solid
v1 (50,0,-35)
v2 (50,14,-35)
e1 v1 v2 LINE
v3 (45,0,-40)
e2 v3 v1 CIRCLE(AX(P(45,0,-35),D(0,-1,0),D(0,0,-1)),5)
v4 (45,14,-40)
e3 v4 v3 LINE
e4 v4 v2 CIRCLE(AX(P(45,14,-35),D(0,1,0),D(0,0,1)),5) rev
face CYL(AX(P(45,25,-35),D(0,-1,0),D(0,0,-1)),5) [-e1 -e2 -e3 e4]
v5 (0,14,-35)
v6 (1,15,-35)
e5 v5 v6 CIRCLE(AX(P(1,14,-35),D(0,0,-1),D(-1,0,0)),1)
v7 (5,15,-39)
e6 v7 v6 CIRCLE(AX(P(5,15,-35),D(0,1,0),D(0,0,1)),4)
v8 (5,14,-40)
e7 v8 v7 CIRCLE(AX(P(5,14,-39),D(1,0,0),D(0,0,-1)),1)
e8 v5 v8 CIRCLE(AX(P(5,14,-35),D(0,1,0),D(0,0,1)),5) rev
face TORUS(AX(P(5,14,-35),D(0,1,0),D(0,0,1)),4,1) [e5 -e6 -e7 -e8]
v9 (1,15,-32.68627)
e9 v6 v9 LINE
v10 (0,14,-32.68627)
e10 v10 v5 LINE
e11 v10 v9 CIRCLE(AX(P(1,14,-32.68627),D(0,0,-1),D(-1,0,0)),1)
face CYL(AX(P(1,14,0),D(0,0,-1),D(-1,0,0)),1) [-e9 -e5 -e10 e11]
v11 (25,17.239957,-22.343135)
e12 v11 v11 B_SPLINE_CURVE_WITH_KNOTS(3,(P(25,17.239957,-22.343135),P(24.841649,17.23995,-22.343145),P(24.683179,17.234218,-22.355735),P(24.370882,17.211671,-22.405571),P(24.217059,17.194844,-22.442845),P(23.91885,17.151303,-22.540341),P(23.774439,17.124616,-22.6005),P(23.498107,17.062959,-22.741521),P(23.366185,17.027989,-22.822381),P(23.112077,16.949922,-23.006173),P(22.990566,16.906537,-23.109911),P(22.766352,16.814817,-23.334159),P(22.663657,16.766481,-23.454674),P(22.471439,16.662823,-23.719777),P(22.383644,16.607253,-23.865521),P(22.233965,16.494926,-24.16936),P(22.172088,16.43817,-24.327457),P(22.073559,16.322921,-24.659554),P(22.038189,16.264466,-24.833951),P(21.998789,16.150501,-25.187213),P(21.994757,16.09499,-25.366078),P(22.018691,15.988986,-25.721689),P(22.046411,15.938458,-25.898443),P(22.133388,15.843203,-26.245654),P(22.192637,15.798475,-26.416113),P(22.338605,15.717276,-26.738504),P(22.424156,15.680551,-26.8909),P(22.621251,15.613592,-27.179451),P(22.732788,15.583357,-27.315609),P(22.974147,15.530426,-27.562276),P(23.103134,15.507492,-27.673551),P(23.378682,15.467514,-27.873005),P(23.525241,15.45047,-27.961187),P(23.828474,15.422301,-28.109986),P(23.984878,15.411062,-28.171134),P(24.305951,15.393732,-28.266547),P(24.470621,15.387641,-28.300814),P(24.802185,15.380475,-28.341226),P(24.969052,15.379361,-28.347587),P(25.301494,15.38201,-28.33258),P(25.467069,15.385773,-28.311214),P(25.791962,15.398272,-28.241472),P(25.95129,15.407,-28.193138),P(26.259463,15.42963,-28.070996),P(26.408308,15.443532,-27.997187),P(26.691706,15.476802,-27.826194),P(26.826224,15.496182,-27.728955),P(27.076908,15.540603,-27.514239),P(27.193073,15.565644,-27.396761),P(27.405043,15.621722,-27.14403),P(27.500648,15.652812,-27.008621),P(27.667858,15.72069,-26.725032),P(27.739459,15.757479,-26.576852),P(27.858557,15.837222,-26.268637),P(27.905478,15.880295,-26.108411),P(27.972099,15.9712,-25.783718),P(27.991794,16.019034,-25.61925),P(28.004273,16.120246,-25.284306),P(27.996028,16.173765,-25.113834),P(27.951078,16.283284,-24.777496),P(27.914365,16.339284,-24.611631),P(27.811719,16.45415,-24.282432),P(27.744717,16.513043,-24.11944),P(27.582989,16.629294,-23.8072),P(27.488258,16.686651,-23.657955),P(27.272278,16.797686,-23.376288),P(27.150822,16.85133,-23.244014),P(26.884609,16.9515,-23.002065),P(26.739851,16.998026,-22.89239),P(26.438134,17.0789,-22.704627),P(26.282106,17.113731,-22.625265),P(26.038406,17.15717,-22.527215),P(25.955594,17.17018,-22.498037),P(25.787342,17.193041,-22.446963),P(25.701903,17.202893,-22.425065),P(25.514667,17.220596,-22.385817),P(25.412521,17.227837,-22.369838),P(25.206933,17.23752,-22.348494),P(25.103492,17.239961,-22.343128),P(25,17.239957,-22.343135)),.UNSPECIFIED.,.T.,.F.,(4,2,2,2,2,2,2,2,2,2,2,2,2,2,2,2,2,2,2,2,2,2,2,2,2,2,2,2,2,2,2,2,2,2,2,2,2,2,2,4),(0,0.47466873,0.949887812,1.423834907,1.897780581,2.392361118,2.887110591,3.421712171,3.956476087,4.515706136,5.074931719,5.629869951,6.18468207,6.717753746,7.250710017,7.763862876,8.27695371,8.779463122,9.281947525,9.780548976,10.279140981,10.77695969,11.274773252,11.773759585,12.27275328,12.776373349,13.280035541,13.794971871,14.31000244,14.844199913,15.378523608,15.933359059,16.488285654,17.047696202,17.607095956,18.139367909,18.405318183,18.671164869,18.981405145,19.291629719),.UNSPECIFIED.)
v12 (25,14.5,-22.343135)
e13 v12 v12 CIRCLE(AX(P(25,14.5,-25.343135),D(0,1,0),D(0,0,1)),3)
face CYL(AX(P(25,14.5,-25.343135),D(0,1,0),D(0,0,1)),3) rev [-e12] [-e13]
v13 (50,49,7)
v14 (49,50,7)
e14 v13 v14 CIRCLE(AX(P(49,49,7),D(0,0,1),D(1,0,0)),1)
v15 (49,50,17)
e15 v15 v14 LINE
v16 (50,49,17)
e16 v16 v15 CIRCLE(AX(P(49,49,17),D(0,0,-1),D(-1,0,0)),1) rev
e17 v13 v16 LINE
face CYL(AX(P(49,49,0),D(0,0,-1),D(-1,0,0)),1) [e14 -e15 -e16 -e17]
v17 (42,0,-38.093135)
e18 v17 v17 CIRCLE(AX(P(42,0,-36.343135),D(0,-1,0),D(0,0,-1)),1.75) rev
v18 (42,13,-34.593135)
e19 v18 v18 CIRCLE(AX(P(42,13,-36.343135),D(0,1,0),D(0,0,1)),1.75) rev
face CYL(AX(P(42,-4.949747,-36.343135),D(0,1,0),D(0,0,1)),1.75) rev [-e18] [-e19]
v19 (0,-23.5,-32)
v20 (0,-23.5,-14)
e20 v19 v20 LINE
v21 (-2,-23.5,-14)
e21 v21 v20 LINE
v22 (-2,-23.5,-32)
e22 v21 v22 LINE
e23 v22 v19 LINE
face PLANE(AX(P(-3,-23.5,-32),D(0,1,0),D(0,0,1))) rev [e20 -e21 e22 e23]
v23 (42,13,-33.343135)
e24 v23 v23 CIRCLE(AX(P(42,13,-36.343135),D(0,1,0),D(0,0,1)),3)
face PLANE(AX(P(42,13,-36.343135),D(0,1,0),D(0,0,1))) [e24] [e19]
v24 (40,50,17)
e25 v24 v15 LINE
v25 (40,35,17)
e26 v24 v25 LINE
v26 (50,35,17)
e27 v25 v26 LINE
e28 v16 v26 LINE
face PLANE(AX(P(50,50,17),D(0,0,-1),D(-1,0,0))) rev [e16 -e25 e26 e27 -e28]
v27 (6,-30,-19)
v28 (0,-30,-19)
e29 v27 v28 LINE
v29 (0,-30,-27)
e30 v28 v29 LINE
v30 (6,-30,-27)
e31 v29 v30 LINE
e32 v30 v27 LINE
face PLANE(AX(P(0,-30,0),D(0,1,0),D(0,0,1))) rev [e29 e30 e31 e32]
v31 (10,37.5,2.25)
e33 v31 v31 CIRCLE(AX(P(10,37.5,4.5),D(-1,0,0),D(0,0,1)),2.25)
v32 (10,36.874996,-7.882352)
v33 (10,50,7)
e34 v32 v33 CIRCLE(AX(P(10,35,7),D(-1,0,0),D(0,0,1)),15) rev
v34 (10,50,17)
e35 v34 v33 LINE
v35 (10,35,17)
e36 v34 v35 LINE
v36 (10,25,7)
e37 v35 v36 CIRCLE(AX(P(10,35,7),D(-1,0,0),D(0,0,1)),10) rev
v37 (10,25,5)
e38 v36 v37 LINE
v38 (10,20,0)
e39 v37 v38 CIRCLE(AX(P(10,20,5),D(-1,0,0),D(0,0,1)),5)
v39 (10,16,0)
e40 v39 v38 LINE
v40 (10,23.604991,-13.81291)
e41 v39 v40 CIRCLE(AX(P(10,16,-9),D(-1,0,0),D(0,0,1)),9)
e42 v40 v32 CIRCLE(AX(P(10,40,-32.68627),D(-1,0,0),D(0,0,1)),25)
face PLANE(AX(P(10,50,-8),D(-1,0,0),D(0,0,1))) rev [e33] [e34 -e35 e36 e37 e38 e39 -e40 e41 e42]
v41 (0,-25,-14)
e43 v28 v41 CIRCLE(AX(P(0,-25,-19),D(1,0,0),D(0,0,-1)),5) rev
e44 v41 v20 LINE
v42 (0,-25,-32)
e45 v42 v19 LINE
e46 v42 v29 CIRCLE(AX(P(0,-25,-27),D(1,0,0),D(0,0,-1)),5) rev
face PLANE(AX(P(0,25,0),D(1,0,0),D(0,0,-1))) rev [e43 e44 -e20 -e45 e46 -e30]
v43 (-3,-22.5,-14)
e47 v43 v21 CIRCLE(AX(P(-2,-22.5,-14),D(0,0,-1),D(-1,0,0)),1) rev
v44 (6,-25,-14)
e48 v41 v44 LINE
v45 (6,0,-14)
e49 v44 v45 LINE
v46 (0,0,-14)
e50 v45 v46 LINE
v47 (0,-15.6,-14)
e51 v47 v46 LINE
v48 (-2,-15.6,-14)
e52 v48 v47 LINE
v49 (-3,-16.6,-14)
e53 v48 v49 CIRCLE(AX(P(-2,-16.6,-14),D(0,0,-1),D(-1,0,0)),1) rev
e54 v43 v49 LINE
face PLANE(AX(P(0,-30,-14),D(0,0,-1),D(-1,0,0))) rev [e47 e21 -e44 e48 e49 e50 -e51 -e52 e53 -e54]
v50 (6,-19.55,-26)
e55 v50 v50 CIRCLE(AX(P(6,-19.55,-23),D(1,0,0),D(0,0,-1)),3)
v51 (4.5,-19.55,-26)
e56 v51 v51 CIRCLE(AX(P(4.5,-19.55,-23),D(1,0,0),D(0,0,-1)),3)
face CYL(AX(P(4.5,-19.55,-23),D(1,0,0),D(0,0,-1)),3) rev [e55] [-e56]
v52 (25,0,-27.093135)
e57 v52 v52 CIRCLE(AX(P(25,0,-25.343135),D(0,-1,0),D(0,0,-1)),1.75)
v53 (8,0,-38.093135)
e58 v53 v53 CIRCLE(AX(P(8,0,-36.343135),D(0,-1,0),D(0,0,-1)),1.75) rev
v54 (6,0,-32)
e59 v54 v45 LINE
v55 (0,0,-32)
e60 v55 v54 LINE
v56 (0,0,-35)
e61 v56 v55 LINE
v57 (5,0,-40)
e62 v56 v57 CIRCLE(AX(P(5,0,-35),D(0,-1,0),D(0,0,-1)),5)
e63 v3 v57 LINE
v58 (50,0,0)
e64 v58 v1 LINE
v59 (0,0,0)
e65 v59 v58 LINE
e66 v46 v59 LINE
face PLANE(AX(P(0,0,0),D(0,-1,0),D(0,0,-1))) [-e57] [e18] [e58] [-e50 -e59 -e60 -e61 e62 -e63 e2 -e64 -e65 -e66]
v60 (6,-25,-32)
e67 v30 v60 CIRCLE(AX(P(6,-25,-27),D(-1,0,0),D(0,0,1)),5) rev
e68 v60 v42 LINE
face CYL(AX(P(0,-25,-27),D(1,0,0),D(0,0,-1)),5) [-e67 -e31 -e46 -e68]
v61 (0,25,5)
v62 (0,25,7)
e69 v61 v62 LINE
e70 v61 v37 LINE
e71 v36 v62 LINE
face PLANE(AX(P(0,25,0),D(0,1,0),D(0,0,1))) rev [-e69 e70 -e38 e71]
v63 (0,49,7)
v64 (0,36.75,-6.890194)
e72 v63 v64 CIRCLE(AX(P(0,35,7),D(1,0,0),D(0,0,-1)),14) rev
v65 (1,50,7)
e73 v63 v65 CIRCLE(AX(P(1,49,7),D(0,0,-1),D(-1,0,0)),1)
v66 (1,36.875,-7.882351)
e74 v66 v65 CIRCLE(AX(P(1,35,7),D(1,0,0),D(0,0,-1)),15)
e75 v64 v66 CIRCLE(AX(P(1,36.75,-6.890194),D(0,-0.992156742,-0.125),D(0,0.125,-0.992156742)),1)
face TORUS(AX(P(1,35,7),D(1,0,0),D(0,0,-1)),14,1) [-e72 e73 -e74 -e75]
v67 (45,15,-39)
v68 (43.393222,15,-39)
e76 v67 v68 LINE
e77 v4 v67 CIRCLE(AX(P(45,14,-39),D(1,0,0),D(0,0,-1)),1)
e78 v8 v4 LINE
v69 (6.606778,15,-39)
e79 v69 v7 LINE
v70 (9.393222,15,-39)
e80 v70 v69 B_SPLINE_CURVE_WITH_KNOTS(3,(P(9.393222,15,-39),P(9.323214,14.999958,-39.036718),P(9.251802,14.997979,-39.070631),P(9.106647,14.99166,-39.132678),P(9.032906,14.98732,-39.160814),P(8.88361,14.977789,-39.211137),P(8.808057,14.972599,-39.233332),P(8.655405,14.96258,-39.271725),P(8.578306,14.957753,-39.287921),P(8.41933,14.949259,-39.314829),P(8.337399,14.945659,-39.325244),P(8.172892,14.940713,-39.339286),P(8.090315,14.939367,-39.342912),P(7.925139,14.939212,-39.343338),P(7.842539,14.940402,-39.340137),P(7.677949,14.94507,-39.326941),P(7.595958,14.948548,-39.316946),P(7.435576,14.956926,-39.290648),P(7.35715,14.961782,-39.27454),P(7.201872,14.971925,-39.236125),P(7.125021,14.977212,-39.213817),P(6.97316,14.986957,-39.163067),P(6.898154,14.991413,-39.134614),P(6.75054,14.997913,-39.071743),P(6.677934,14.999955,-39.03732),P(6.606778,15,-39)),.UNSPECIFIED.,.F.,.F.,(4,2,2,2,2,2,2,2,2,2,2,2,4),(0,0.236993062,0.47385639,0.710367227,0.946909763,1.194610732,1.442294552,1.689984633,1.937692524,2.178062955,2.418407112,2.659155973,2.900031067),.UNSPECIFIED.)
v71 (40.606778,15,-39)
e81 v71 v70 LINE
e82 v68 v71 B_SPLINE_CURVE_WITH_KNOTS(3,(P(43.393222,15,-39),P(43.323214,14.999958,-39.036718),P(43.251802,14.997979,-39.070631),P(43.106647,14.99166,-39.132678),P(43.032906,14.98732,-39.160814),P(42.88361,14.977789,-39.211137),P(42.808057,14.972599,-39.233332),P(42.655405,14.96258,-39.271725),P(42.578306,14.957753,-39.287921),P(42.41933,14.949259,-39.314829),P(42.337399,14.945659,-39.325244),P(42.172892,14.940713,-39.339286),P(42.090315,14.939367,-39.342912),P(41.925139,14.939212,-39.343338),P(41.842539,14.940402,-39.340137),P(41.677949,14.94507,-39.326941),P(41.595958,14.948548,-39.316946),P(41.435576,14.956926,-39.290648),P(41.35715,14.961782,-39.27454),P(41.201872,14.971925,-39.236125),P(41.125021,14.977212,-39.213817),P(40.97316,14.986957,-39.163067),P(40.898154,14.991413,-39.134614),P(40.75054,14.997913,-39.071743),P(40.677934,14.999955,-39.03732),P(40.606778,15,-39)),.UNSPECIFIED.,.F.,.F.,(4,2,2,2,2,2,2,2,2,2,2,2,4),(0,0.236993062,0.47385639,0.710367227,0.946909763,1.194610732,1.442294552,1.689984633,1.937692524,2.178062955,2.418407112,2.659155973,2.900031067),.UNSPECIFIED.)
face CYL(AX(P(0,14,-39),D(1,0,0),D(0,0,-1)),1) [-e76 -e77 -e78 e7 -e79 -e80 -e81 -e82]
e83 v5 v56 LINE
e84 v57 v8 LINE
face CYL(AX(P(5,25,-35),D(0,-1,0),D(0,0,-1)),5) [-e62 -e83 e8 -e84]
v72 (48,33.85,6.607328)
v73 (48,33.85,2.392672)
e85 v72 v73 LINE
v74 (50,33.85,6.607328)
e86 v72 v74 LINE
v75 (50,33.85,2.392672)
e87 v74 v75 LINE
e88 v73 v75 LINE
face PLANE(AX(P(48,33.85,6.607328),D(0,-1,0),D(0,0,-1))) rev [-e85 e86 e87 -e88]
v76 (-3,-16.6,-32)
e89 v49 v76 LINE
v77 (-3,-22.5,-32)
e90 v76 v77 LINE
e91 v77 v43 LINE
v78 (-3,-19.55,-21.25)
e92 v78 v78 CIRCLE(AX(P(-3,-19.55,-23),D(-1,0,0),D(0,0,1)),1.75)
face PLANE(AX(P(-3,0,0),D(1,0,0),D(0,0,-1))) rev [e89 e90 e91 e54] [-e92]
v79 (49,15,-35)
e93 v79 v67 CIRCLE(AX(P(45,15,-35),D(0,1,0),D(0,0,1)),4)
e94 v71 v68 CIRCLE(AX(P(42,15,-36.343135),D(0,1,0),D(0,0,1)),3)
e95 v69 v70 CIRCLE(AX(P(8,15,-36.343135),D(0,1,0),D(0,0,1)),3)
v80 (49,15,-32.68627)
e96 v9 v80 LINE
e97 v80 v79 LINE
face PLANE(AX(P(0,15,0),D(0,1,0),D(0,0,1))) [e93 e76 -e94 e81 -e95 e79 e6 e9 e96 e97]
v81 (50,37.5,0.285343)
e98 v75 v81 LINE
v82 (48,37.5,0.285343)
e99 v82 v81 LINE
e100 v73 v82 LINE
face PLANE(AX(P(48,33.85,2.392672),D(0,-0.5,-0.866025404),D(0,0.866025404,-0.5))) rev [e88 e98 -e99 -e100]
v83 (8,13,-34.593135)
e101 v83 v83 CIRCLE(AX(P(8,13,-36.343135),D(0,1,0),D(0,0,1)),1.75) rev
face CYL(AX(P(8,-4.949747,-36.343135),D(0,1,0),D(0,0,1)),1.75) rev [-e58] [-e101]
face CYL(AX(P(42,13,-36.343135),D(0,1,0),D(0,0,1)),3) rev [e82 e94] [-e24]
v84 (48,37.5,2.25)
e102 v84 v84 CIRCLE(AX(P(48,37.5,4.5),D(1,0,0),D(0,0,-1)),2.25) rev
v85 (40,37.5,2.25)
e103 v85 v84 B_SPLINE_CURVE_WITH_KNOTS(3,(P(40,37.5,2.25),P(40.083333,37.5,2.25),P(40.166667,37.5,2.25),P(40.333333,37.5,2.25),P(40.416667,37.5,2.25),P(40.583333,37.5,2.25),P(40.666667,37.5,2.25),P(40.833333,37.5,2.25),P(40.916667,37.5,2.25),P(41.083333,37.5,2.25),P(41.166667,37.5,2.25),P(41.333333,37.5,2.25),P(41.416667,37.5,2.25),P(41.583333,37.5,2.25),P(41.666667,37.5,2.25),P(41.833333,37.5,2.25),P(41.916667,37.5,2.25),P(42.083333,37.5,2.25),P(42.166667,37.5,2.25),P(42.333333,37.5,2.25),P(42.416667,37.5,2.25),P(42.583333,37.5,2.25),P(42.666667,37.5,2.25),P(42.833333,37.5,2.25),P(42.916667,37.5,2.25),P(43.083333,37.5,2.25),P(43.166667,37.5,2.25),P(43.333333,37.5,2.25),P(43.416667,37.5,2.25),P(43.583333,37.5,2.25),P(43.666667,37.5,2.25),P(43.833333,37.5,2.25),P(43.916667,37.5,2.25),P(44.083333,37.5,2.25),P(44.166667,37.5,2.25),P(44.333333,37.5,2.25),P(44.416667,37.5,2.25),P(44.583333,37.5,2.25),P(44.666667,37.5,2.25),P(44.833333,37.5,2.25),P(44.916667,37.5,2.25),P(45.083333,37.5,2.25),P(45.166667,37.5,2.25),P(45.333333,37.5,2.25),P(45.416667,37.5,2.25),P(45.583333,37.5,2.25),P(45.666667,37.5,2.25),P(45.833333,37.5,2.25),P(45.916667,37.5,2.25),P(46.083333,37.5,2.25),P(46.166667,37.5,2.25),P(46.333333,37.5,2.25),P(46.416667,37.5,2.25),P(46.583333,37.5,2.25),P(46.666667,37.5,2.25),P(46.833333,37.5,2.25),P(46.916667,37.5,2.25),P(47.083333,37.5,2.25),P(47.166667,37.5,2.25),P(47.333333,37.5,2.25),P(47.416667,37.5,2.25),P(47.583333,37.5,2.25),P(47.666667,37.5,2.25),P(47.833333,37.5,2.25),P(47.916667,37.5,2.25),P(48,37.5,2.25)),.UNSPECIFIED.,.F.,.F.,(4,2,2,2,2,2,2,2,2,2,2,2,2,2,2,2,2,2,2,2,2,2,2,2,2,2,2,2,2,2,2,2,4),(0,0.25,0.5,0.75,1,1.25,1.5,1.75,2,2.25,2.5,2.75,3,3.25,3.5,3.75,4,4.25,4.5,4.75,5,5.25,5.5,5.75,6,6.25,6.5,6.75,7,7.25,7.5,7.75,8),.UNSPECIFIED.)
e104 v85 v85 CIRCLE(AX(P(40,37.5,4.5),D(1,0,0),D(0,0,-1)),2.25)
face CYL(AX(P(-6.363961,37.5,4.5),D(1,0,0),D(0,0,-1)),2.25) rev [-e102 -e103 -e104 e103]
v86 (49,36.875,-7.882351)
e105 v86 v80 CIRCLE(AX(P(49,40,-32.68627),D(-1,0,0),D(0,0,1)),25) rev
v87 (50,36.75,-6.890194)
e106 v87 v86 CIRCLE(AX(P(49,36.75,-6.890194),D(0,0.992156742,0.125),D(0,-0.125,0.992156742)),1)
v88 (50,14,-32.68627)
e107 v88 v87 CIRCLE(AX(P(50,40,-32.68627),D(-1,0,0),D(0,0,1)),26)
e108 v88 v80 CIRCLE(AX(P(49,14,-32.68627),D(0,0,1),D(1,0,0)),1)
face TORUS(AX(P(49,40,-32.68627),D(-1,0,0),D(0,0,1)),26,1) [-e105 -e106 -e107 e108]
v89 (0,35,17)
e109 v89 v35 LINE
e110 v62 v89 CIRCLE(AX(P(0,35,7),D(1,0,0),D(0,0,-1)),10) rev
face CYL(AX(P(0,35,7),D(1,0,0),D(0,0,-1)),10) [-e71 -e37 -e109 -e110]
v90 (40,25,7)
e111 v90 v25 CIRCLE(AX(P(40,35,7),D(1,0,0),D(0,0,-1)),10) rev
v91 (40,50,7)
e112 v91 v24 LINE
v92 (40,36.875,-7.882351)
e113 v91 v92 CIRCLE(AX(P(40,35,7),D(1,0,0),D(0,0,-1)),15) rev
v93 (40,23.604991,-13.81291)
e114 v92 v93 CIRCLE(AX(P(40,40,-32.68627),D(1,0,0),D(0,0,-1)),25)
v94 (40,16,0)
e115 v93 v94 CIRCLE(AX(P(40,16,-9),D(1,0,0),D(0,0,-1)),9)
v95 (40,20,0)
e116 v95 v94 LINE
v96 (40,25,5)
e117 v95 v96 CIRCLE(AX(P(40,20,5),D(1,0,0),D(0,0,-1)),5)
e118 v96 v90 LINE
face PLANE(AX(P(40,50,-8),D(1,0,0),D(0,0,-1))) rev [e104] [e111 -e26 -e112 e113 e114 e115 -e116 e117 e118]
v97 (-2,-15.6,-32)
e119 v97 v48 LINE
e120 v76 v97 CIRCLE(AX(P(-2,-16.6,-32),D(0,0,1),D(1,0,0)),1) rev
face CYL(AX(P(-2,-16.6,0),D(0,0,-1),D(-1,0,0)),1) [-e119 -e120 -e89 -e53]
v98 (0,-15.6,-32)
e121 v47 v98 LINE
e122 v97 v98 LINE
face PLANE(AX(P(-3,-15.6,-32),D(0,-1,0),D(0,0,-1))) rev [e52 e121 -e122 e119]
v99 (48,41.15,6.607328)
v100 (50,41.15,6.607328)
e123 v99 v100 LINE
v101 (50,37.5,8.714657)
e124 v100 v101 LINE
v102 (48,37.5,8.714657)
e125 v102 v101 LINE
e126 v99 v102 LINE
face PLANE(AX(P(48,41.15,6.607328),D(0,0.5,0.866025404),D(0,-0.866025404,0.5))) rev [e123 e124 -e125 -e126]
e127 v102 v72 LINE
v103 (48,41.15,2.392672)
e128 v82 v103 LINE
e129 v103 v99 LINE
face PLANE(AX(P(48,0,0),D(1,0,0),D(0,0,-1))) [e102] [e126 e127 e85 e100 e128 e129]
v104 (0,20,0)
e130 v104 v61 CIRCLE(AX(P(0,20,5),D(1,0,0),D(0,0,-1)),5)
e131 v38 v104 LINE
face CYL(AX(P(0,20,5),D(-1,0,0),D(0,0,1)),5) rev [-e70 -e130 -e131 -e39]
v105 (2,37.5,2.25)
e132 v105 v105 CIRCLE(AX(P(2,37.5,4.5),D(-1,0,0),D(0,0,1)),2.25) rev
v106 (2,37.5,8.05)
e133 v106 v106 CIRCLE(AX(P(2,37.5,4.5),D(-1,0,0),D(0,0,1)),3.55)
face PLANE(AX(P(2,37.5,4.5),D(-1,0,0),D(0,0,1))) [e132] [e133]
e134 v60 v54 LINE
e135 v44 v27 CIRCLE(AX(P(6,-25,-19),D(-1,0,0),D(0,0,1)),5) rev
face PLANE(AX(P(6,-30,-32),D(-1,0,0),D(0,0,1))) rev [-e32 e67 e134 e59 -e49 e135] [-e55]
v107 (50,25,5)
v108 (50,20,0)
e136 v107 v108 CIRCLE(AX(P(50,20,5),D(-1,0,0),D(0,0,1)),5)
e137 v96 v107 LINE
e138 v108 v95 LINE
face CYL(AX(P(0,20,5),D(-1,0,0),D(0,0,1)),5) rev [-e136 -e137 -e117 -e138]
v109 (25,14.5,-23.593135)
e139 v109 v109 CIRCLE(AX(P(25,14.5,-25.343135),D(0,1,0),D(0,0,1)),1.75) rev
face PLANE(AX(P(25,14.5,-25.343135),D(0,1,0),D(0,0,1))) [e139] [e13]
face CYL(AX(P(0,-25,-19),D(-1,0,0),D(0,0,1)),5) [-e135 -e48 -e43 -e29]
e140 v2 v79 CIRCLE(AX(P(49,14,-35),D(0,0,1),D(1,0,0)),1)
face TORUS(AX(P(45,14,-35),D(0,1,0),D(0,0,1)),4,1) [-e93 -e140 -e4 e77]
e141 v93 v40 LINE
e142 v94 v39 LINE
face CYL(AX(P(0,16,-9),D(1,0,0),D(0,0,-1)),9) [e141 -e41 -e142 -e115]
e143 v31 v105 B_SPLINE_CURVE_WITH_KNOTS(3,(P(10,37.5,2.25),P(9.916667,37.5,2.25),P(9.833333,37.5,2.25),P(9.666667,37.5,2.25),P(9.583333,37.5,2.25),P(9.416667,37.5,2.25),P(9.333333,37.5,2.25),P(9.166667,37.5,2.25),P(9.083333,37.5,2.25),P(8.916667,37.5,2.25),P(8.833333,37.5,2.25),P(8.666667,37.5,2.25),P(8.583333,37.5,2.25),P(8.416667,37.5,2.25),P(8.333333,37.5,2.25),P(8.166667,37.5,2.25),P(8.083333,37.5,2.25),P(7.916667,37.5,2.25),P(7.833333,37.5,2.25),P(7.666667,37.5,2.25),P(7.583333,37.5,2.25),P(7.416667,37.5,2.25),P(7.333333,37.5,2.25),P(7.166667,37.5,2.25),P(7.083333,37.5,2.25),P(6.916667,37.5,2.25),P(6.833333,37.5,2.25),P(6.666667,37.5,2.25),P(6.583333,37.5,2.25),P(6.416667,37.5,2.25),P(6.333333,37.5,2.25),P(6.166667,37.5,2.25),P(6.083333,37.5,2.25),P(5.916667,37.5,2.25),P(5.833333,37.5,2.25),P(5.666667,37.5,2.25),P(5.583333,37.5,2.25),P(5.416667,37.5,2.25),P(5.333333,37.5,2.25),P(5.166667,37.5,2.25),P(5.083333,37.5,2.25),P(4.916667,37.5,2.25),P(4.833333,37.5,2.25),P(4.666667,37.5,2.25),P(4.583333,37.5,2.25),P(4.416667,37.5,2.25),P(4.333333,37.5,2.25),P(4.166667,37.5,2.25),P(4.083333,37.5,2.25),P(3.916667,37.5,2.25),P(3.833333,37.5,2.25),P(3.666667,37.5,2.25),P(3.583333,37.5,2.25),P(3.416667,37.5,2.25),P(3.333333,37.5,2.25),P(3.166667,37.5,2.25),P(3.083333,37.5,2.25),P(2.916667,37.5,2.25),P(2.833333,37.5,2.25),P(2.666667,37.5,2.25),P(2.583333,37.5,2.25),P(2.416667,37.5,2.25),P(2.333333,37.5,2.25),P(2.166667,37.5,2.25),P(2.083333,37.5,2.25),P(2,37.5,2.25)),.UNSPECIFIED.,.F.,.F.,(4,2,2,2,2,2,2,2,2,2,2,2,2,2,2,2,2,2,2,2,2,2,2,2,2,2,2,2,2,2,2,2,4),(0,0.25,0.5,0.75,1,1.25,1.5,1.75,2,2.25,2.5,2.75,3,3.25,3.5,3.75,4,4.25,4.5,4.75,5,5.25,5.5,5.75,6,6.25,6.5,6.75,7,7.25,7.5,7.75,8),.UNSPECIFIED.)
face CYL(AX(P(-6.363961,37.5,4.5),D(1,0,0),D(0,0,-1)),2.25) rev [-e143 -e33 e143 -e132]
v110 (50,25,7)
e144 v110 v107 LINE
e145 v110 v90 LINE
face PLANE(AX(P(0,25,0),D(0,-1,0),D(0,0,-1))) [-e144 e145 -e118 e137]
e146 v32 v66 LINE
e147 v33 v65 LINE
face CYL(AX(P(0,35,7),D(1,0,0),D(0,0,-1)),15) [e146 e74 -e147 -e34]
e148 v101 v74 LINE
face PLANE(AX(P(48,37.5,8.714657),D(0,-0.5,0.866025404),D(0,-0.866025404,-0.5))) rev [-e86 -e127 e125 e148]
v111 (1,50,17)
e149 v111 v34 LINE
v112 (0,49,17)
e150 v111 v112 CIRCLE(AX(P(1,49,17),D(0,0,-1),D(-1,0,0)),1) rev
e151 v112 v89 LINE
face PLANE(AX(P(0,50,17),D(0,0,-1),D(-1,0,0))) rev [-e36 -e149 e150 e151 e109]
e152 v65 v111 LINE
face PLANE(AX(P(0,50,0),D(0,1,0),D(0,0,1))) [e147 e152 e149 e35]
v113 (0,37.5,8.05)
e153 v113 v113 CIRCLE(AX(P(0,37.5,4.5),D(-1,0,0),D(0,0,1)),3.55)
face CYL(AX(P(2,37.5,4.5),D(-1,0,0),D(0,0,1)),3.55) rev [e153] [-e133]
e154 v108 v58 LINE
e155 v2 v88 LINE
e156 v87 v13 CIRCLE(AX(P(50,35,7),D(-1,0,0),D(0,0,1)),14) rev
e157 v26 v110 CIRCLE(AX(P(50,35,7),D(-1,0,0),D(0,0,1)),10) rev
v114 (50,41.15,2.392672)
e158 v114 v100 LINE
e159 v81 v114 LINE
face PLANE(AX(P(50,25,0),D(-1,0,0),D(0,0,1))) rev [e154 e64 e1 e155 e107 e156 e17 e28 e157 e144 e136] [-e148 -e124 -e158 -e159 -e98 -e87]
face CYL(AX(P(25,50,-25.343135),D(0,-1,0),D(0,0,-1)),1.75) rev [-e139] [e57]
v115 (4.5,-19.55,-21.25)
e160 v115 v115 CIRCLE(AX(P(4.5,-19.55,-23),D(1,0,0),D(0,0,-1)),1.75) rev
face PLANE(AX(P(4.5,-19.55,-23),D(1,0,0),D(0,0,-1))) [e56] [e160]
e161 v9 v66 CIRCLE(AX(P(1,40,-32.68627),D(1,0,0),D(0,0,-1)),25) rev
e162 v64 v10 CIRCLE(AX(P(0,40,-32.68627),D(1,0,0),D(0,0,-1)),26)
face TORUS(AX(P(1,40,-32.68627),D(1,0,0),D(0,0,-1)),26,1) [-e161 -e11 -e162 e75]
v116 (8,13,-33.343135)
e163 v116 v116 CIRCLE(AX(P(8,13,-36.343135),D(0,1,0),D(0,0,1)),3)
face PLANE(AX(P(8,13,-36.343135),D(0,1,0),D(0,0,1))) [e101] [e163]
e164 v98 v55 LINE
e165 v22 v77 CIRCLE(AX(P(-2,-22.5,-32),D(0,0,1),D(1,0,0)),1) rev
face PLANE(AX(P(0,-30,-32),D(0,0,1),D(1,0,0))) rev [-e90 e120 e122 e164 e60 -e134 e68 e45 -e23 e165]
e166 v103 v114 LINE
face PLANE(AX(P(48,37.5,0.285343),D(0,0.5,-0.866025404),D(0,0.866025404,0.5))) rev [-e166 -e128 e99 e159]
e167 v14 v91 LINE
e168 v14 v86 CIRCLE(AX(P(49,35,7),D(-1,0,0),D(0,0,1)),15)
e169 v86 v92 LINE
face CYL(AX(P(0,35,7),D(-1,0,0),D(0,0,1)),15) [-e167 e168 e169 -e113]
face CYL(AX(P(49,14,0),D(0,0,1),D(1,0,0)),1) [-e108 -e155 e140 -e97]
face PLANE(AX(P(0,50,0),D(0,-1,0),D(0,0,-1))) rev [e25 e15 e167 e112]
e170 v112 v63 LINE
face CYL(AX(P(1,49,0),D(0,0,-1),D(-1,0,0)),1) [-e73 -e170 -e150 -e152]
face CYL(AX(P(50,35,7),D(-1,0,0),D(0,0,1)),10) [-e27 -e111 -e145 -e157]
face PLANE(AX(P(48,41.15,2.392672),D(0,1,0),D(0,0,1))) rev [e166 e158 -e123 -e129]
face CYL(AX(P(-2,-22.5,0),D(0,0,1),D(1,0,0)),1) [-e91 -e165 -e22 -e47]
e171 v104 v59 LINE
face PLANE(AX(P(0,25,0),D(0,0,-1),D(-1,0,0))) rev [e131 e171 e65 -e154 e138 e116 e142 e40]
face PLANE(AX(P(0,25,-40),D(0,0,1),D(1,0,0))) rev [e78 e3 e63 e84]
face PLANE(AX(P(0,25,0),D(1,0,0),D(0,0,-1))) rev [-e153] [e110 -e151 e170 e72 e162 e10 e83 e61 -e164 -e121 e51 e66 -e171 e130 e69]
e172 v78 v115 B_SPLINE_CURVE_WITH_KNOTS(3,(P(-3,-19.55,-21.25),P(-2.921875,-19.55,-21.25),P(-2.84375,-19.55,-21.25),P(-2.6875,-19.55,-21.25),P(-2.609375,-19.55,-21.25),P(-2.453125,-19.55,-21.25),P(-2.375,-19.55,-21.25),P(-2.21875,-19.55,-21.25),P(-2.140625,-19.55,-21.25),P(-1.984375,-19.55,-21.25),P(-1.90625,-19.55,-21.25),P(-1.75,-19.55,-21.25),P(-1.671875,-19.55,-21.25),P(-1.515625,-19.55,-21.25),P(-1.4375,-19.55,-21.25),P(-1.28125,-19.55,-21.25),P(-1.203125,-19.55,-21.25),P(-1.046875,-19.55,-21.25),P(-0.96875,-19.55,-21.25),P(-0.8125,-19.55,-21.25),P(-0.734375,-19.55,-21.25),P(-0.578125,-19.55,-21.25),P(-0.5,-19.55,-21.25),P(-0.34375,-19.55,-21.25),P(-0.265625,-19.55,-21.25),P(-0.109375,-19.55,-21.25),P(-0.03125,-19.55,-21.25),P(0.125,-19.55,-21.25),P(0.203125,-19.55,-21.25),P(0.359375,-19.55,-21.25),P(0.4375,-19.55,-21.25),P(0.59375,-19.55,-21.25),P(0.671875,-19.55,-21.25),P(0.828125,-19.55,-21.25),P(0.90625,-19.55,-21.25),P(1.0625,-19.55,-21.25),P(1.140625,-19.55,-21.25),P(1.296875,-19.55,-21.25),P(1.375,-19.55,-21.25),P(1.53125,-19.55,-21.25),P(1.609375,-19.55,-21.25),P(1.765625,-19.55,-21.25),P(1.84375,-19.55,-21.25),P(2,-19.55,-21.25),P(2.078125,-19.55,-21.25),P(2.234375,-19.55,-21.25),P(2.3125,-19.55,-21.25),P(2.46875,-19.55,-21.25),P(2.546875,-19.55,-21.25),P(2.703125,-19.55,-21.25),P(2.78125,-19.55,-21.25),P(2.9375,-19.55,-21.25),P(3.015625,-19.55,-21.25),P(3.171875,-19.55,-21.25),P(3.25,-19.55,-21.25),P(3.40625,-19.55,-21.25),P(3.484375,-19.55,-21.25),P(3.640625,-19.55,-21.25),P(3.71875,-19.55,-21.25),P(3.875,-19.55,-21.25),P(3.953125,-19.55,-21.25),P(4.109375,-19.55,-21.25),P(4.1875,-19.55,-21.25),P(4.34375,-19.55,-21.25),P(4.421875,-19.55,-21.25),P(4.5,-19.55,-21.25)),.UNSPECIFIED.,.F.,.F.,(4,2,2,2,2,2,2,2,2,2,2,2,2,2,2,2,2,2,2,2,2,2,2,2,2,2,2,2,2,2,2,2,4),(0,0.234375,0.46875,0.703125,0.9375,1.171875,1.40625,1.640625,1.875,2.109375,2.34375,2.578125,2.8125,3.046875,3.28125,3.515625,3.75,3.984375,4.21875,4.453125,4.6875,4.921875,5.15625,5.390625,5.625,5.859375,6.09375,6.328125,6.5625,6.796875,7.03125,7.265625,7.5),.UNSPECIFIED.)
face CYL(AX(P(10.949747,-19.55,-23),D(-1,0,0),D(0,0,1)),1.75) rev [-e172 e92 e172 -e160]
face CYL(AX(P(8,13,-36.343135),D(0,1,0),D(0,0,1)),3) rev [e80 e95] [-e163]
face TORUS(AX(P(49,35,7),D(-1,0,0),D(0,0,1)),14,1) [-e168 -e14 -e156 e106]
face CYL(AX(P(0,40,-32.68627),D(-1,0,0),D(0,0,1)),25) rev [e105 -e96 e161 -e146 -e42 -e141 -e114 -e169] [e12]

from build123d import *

# Parameters (mm, degrees)
CROQUIS1_W              = 50
CROQUIS1_H              = 40
SALIENTE_EXTRUIR1_DEPTH = 25
CROQUIS4_W              = 10
CROQUIS4_H              = 25
SALIENTE_EXTRUIR3_DEPTH = 25
CORTAR_EXTRUIR2_REACH   = 83.24
CROQUIS5_R              = 2.25
REDONDEO4_R             = 15
REDONDEO5_R             = 10
REDONDEO6_R             = 9
CROQUIS6_W              = 50
CROQUIS6_H              = 31
CORTAR_EXTRUIR3_DEPTH   = 10
CROQUIS7_W              = 50
CROQUIS7_H              = 10
CORTAR_EXTRUIR4_DEPTH   = 1
REDONDEO7_DEPTH         = 50
REDONDEO7_2_DEPTH       = 10
REDONDEO7_START         = 40
REDONDEO7_3_DEPTH       = 10
REDONDEO8_R             = 5
CROQUIS8_R              = 1.75
CORTAR_EXTRUIR5_DEPTH   = 15
CROQUIS9_R              = 3
CORTAR_EXTRUIR6_DEPTH   = 2
REDONDEO9_R             = 5
CROQUIS10_W             = 6
CROQUIS10_H             = 18
SALIENTE_EXTRUIR4_DEPTH = 30
CROQUIS11_W             = 18
CROQUIS11_H             = 7.9
SALIENTE_EXTRUIR5_DEPTH = 3
REDONDEO10_R            = 1
CROQUIS12_R             = 1.75
CORTAR_EXTRUIR7_DEPTH   = 9
CROQUIS13_R             = 3
CORTAR_EXTRUIR8_DEPTH   = 1.5
CROQUIS16_R             = 1.75
CORTAR_EXTRUIR9_DEPTH   = 82.240384046
CROQUIS17_R             = 3
CORTAR_EXTRUIR10_DEPTH  = 5.5
REDONDEO11_R            = 5
REDONDEO12_R            = 1
CROQUIS18_R             = 3.55
CORTAR_EXTRUIR11_DEPTH  = 2
CORTAR_EXTRUIR12_DEPTH  = 2


with BuildPart() as part:
    # Croquis1 → Saliente-Extruir1 (new body)
    with BuildSketch(Plane(origin=(0, 0, 0), x_dir=(1, 0, 0), z_dir=(0, 1, 0))):
        with Locations((25, 20)):
            Rectangle(CROQUIS1_W, CROQUIS1_H)
    extrude(amount=SALIENTE_EXTRUIR1_DEPTH)

    # Croquis4 → Saliente-Extruir3 (add)
    with BuildSketch(Plane(origin=(0, 25, 0), x_dir=(1, 0, 0), z_dir=(0, 1, 0))):
        with Locations((5, -4.5)):
            Rectangle(CROQUIS4_W, CROQUIS4_H)
        with Locations((45, -4.5)):
            Rectangle(CROQUIS4_W, CROQUIS4_H)
    extrude(amount=SALIENTE_EXTRUIR3_DEPTH)

    # Cortar-Extruir2: up to this face of the body (flat: up to its plane)
    cortar_extruir2_end = Plane(part.part.faces().sort_by_distance((0, 22.115384615, -10.576923077))[0])
    # Croquis5 → Cortar-Extruir2 (cut, up to the picked face)
    with BuildSketch(Plane(origin=(50, 0, 0), x_dir=(0, 0, -1), z_dir=(1, 0, 0)), mode=Mode.PRIVATE) as cortar_extruir2_sk1:
        with Locations((-4.5, 37.5)):
            Circle(CROQUIS5_R)
    cortar_extruir2_tool1 = split(extrude(cortar_extruir2_sk1.sketch, amount=-CORTAR_EXTRUIR2_REACH, mode=Mode.PRIVATE), bisect_by=cortar_extruir2_end, keep=Keep.BOTH, mode=Mode.PRIVATE)
    add(cortar_extruir2_tool1.solids().sort_by(Axis((50, 37.5, 4.5), (-1, 0, 0)))[0], mode=Mode.SUBTRACT)

    # Redondeo4
    redondeo4_edges = [part.edges().sort_by_distance(p)[0] for p in [
        (5, 50, -8),
        (45, 50, -8),
    ]]
    fillet(redondeo4_edges, radius=REDONDEO4_R)

    # Redondeo5
    redondeo5_edges = [part.edges().sort_by_distance(p)[0] for p in [
        (5, 25, 17),
        (45, 25, 17),
    ]]
    fillet(redondeo5_edges, radius=REDONDEO5_R)

    # Redondeo6
    # the kernel refuses this fillet: 9 mm, written as the material it takes off along each edge
    with BuildSketch(Plane(origin=(-12.5, 25, 0), x_dir=(0, -1, 0), z_dir=(1, 0, 0))) as redondeo6_piece_1_section:
        with BuildLine():
            CenterArc((REDONDEO6_R, REDONDEO6_R), REDONDEO6_R, 180, 90)
            Line((0, REDONDEO6_R), (0, 0))
            Line((0, 0), (REDONDEO6_R, 0))
        make_face()
    redondeo6_piece_1 = extrude(amount=75, mode=Mode.PRIVATE)
    redondeo6_piece_1 = split(redondeo6_piece_1, bisect_by=Plane(origin=(-12.5, 25, -8), z_dir=(0, 0, -1)), keep=Keep.TOP, mode=Mode.PRIVATE)
    add(redondeo6_piece_1, mode=Mode.SUBTRACT)
    with BuildSketch(Plane(origin=(10, 25, 0), x_dir=(0, -1, 0), z_dir=(1, 0, 0))) as redondeo6_piece_2:
        with BuildLine():
            CenterArc((REDONDEO6_R, REDONDEO6_R), REDONDEO6_R, 180, 90)
            Line((0, REDONDEO6_R), (0, 0))
            Line((0, 0), (REDONDEO6_R, 0))
        make_face()
    extrude(amount=30, mode=Mode.SUBTRACT)

    # Croquis6 → Cortar-Extruir3 (cut)
    with BuildSketch(Plane(origin=(0, 25, 0), x_dir=(1, 0, 0), z_dir=(0, 1, 0))):
        with Locations((25, 24.5)):
            Rectangle(CROQUIS6_W, CROQUIS6_H)
    extrude(amount=-CORTAR_EXTRUIR3_DEPTH, mode=Mode.SUBTRACT)

    # Croquis7 → Cortar-Extruir4 (cut)
    with BuildSketch(Plane(origin=(0, 0, -9), x_dir=(-1, 0, 0), z_dir=(0, 0, -1))):
        with Locations((-25, 20)):
            Rectangle(CROQUIS7_W, CROQUIS7_H)
    extrude(amount=-CORTAR_EXTRUIR4_DEPTH, mode=Mode.SUBTRACT)

    # Redondeo7: read off the stored shape, not the designer's step
    # Redondeo7 outline → Redondeo7 (add)
    with BuildSketch(Plane.YZ):
        with BuildLine():
            ThreePointArc((15, -32.686269666), (17.252745058, -22.315040587), (23.604991409, -13.812910312))
            ThreePointArc((23.604991409, -13.812910312), (24.770234357, -11.020640821), (24.94427191, -8))
            Line((24.94427191, -8), (15, -8))
            Line((15, -8), (15, -32.686269666))
        make_face()
    extrude(amount=REDONDEO7_DEPTH)

    # Redondeo7 2 outline → Redondeo7 2 (add)
    with BuildSketch(Plane.YZ):
        with BuildLine():
            ThreePointArc((24.94427191, -8), (24.770234357, -11.020640821), (23.604991409, -13.812910312))
            ThreePointArc((23.604991409, -13.812910312), (29.799482027, -9.86195296), (36.875, -7.882351125))
            ThreePointArc((36.875, -7.882351125), (35.939342999, -7.970558932), (35, -8))
            Line((35, -8), (24.94427191, -8))
        make_face()
    extrude(amount=REDONDEO7_2_DEPTH)

    # Redondeo7 3 outline → Redondeo7 3 (add)
    with BuildSketch(Plane.YZ.offset(REDONDEO7_START)):
        with BuildLine():
            ThreePointArc((24.94427191, -8), (24.770234357, -11.020640821), (23.604991409, -13.812910312))
            ThreePointArc((23.604991409, -13.812910312), (29.799482027, -9.86195296), (36.875, -7.882351125))
            ThreePointArc((36.875, -7.882351125), (35.939342999, -7.970558932), (35, -8))
            Line((35, -8), (24.94427191, -8))
        make_face()
    extrude(amount=REDONDEO7_3_DEPTH)

    # Redondeo8
    redondeo8_edges = [part.edges().sort_by_distance(p)[0] for p in [
        (45, 25, 0),
        (5, 25, 0),
    ]]
    fillet(redondeo8_edges, radius=REDONDEO8_R)

    # Croquis8 → Cortar-Extruir5 (cut)
    with BuildSketch(Plane(origin=(0, 15, 0), x_dir=(1, 0, 0), z_dir=(0, 1, 0))):
        with Locations(Location((8, 36.343134833, 0), (0, 0, 270))):
            Circle(CROQUIS8_R)
        with Locations(Location((42, 36.343134833, 0), (0, 0, 270))):
            Circle(CROQUIS8_R)
    extrude(amount=-CORTAR_EXTRUIR5_DEPTH, mode=Mode.SUBTRACT)

    # Croquis9 → Cortar-Extruir6 (cut)
    with BuildSketch(Plane(origin=(0, 15, 0), x_dir=(1, 0, 0), z_dir=(0, 1, 0))):
        with Locations(Location((8, 36.343134833, 0), (0, 0, 270))):
            Circle(CROQUIS9_R)
        with Locations(Location((42, 36.343134833, 0), (0, 0, 270))):
            Circle(CROQUIS9_R)
    extrude(amount=-CORTAR_EXTRUIR6_DEPTH, mode=Mode.SUBTRACT)

    # Redondeo9
    redondeo9_edges = [part.edges().sort_by_distance(p)[0] for p in [
        (0, 7.5, -40),
        (50, 7.5, -40),
    ]]
    fillet(redondeo9_edges, radius=REDONDEO9_R)

    # Croquis10 → Saliente-Extruir4 (add)
    with BuildSketch(Plane.XZ):
        with Locations((3, -23)):
            Rectangle(CROQUIS10_W, CROQUIS10_H)
    extrude(amount=SALIENTE_EXTRUIR4_DEPTH)

    # Croquis11 → Saliente-Extruir5 (add)
    with BuildSketch(Plane.ZY):
        with Locations((-23, -19.55)):
            Rectangle(CROQUIS11_W, CROQUIS11_H)
    extrude(amount=SALIENTE_EXTRUIR5_DEPTH)

    # Redondeo10
    redondeo10_edges = [part.edges().sort_by_distance(p)[0] for p in [
        (-3, -23.5, -23),
        (-3, -15.6, -23),
    ]]
    fillet(redondeo10_edges, radius=REDONDEO10_R)

    # Croquis12 → Cortar-Extruir7 (cut)
    with BuildSketch(Plane.ZY.offset(3)):
        with Locations((-23, -19.55)):
            Circle(CROQUIS12_R)
    extrude(amount=-CORTAR_EXTRUIR7_DEPTH, mode=Mode.SUBTRACT)

    # Croquis13 → Cortar-Extruir8 (cut)
    with BuildSketch(Plane(origin=(6, 0, 0), x_dir=(0, 0, -1), z_dir=(1, 0, 0))):
        with Locations((23, -19.55)):
            Circle(CROQUIS13_R)
    extrude(amount=-CORTAR_EXTRUIR8_DEPTH, mode=Mode.SUBTRACT)

    # Croquis16 → Cortar-Extruir9 (cut, through all)
    with BuildSketch(Plane.XZ):
        with Locations(Location((25, -25.343134833, 0), (0, 0, 270))):
            Circle(CROQUIS16_R)
    extrude(amount=-CORTAR_EXTRUIR9_DEPTH, mode=Mode.SUBTRACT)

    # Croquis17 → Cortar-Extruir10 (cut)
    with BuildSketch(Plane(origin=(0, 20, 0), x_dir=(1, 0, 0), z_dir=(0, 1, 0))):
        with Locations(Location((25, 25.343134833, 0), (0, 0, 270))):
            Circle(CROQUIS17_R)
    extrude(amount=-CORTAR_EXTRUIR10_DEPTH, mode=Mode.SUBTRACT)

    # Redondeo11
    redondeo11_edges = [part.edges().sort_by_distance(p)[0] for p in [
        (3, -30, -32),
        (3, -30, -14),
    ]]
    fillet(redondeo11_edges, radius=REDONDEO11_R)

    # Redondeo12
    # the kernel refuses this fillet: 1 mm, written as the material it takes off along each edge
    with BuildSketch(Plane(origin=(50, 35, 7), x_dir=(0, 1, 0), z_dir=(0, 0, 1))) as redondeo12_piece_1:
        with BuildLine():
            CenterArc((15 - REDONDEO12_R, REDONDEO12_R), REDONDEO12_R, 270, 90)
            Line((15, REDONDEO12_R), (15, 0))
            Line((15, 0), (15 - REDONDEO12_R, 0))
        make_face()
    revolve(axis=Axis((50, 35, 7), (-1, 0, 0)), revolution_arc=82.819244219, mode=Mode.SUBTRACT)
    with BuildSketch(Plane(origin=(50, 15, -32.686269666), x_dir=(0, -1, 0), z_dir=(0, 0, -1))) as redondeo12_piece_2:
        with BuildLine():
            CenterArc((REDONDEO12_R, REDONDEO12_R), REDONDEO12_R, 180, 90)
            Line((0, REDONDEO12_R), (0, 0))
            Line((0, 0), (REDONDEO12_R, 0))
        make_face()
    extrude(amount=2.313730334, mode=Mode.SUBTRACT)
    with BuildSketch(Plane(origin=(0, 39.999999999, -32.686269666), x_dir=(0, -1.0, -1.5997443370402977e-11), z_dir=(0, 1.5997443370402977e-11, -1.0))) as redondeo12_piece_3:
        with BuildLine():
            CenterArc((24.999999999 + REDONDEO12_R, -REDONDEO12_R), REDONDEO12_R, 90, 90)
            Line((24.999999999, -REDONDEO12_R), (24.999999999, 0))
            Line((24.999999999, 0), (24.999999999 + REDONDEO12_R, 0))
        make_face()
    revolve(axis=Axis((0, 39.999999999, -32.686269666), (-1, 0, 0)), revolution_arc=49.019635862, mode=Mode.SUBTRACT)
    with BuildSketch(Plane(origin=(50, 39.999999999, -32.686269666), x_dir=(0, -1.0, -1.5997443370402977e-11), z_dir=(0, 1.5997443370402977e-11, -1.0))) as redondeo12_piece_4:
        with BuildLine():
            CenterArc((24.999999999 + REDONDEO12_R, REDONDEO12_R), REDONDEO12_R, 180, 90)
            Line((24.999999999, REDONDEO12_R), (24.999999999, 0))
            Line((24.999999999, 0), (24.999999999 + REDONDEO12_R, 0))
        make_face()
    revolve(axis=Axis((50, 39.999999999, -32.686269666), (-1, 0, 0)), revolution_arc=49.019635862, mode=Mode.SUBTRACT)
    with BuildSketch(Plane(origin=(0, 15, -32.686269666), x_dir=(0, -1, 0), z_dir=(0, 0, -1))) as redondeo12_piece_5:
        with BuildLine():
            CenterArc((REDONDEO12_R, -REDONDEO12_R), REDONDEO12_R, 90, 90)
            Line((0, -REDONDEO12_R), (0, 0))
            Line((0, 0), (REDONDEO12_R, 0))
        make_face()
    extrude(amount=2.313730334, mode=Mode.SUBTRACT)
    with BuildSketch(Plane(origin=(45, 15, -40), x_dir=(0, -1, 0), z_dir=(-1, 0, 0))) as redondeo12_piece_6:
        with BuildLine():
            CenterArc((REDONDEO12_R, REDONDEO12_R), REDONDEO12_R, 180, 90)
            Line((0, REDONDEO12_R), (0, 0))
            Line((0, 0), (REDONDEO12_R, 0))
        make_face()
    extrude(amount=40, mode=Mode.SUBTRACT)
    with BuildSketch(Plane(origin=(45, 15, -35), x_dir=(0, 0, -1), z_dir=(-1, 0, 0))) as redondeo12_piece_7:
        with BuildLine():
            CenterArc((5 - REDONDEO12_R, REDONDEO12_R), REDONDEO12_R, 270, 90)
            Line((5 - REDONDEO12_R, 0), (5, 0))
            Line((5, 0), (5, REDONDEO12_R))
        make_face()
    revolve(axis=Axis((45, 15, -35), (0, -1, 0)), revolution_arc=90, mode=Mode.SUBTRACT)
    with BuildSketch(Plane(origin=(5, 15, -35), x_dir=(-1, 0, 0), z_dir=(0, 0, 1))) as redondeo12_piece_8:
        with BuildLine():
            CenterArc((5 - REDONDEO12_R, REDONDEO12_R), REDONDEO12_R, 270, 90)
            Line((5 - REDONDEO12_R, 0), (5, 0))
            Line((5, 0), (5, REDONDEO12_R))
        make_face()
    revolve(axis=Axis((5, 15, -35), (0, -1, 0)), revolution_arc=90, mode=Mode.SUBTRACT)
    with BuildSketch(Plane(origin=(50, 50, 19.5), x_dir=(0, -1, 0), z_dir=(0, 0, -1))) as redondeo12_piece_9:
        with BuildLine():
            CenterArc((REDONDEO12_R, REDONDEO12_R), REDONDEO12_R, 180, 90)
            Line((0, REDONDEO12_R), (0, 0))
            Line((0, 0), (REDONDEO12_R, 0))
        make_face()
    extrude(amount=12.5, mode=Mode.SUBTRACT)
    with BuildSketch(Plane(origin=(0, 50, 19.5), x_dir=(0, -1, 0), z_dir=(0, 0, -1))) as redondeo12_piece_10:
        with BuildLine():
            CenterArc((REDONDEO12_R, -REDONDEO12_R), REDONDEO12_R, 90, 90)
            Line((0, -REDONDEO12_R), (0, 0))
            Line((0, 0), (REDONDEO12_R, 0))
        make_face()
    extrude(amount=12.5, mode=Mode.SUBTRACT)
    with BuildSketch(Plane(origin=(0, 35, 7), x_dir=(0, 0.12499999999783662, -0.992156741649494), z_dir=(0, -0.992156741649494, -0.12499999999783662))) as redondeo12_piece_11:
        with BuildLine():
            CenterArc((15 - REDONDEO12_R, REDONDEO12_R), REDONDEO12_R, 270, 90)
            Line((15, REDONDEO12_R), (15, 0))
            Line((15, 0), (15 - REDONDEO12_R, 0))
        make_face()
    revolve(axis=Axis((0, 35, 7), (1, 0, 0)), revolution_arc=82.819244219, mode=Mode.SUBTRACT)
    with BuildSketch(Plane(origin=(0, 39.999999996, -32.686269659), x_dir=(0, -0.655800343691041, 0.7549343741112287), z_dir=(0, -0.7549343741112287, -0.655800343691041))) as redondeo12_piece_12:
        with BuildLine():
            CenterArc((24.999999992 + REDONDEO12_R, -REDONDEO12_R), REDONDEO12_R, 90, 90)
            Line((24.999999992, -REDONDEO12_R), (24.999999992, 0))
            Line((24.999999992, 0), (24.999999992 + REDONDEO12_R, 0))
        make_face()
    revolve(axis=Axis((0, 39.999999996, -32.686269659), (-1, 0, 0)), revolution_arc=33.799608369, mode=Mode.SUBTRACT)
    with BuildSketch(Plane(origin=(50, 39.999999996, -32.686269659), x_dir=(0, -0.655800343691041, 0.7549343741112287), z_dir=(0, -0.7549343741112287, -0.655800343691041))) as redondeo12_piece_13:
        with BuildLine():
            CenterArc((24.999999992 + REDONDEO12_R, REDONDEO12_R), REDONDEO12_R, 180, 90)
            Line((24.999999992, REDONDEO12_R), (24.999999992, 0))
            Line((24.999999992, 0), (24.999999992 + REDONDEO12_R, 0))
        make_face()
    revolve(axis=Axis((50, 39.999999996, -32.686269659), (-1, 0, 0)), revolution_arc=33.799608369, mode=Mode.SUBTRACT)

    # Croquis18 → Cortar-Extruir11 (cut)
    with BuildSketch(Plane.ZY):
        with Locations((4.5, 37.5)):
            Circle(CROQUIS18_R)
    extrude(amount=-CORTAR_EXTRUIR11_DEPTH, mode=Mode.SUBTRACT)

    # Croquis19 → Cortar-Extruir12 (cut)
    with BuildSketch(Plane(origin=(50, 0, 0), x_dir=(0, 0, -1), z_dir=(1, 0, 0))):
        Polygon((-0.285343035, 37.5), (-2.392671517, 41.15), (-6.607328483, 41.15), (-8.714656965, 37.5), (-6.607328483, 33.85), (-2.392671517, 33.85), align=None)
    extrude(amount=-CORTAR_EXTRUIR12_DEPTH, mode=Mode.SUBTRACT)


solid = part.part
